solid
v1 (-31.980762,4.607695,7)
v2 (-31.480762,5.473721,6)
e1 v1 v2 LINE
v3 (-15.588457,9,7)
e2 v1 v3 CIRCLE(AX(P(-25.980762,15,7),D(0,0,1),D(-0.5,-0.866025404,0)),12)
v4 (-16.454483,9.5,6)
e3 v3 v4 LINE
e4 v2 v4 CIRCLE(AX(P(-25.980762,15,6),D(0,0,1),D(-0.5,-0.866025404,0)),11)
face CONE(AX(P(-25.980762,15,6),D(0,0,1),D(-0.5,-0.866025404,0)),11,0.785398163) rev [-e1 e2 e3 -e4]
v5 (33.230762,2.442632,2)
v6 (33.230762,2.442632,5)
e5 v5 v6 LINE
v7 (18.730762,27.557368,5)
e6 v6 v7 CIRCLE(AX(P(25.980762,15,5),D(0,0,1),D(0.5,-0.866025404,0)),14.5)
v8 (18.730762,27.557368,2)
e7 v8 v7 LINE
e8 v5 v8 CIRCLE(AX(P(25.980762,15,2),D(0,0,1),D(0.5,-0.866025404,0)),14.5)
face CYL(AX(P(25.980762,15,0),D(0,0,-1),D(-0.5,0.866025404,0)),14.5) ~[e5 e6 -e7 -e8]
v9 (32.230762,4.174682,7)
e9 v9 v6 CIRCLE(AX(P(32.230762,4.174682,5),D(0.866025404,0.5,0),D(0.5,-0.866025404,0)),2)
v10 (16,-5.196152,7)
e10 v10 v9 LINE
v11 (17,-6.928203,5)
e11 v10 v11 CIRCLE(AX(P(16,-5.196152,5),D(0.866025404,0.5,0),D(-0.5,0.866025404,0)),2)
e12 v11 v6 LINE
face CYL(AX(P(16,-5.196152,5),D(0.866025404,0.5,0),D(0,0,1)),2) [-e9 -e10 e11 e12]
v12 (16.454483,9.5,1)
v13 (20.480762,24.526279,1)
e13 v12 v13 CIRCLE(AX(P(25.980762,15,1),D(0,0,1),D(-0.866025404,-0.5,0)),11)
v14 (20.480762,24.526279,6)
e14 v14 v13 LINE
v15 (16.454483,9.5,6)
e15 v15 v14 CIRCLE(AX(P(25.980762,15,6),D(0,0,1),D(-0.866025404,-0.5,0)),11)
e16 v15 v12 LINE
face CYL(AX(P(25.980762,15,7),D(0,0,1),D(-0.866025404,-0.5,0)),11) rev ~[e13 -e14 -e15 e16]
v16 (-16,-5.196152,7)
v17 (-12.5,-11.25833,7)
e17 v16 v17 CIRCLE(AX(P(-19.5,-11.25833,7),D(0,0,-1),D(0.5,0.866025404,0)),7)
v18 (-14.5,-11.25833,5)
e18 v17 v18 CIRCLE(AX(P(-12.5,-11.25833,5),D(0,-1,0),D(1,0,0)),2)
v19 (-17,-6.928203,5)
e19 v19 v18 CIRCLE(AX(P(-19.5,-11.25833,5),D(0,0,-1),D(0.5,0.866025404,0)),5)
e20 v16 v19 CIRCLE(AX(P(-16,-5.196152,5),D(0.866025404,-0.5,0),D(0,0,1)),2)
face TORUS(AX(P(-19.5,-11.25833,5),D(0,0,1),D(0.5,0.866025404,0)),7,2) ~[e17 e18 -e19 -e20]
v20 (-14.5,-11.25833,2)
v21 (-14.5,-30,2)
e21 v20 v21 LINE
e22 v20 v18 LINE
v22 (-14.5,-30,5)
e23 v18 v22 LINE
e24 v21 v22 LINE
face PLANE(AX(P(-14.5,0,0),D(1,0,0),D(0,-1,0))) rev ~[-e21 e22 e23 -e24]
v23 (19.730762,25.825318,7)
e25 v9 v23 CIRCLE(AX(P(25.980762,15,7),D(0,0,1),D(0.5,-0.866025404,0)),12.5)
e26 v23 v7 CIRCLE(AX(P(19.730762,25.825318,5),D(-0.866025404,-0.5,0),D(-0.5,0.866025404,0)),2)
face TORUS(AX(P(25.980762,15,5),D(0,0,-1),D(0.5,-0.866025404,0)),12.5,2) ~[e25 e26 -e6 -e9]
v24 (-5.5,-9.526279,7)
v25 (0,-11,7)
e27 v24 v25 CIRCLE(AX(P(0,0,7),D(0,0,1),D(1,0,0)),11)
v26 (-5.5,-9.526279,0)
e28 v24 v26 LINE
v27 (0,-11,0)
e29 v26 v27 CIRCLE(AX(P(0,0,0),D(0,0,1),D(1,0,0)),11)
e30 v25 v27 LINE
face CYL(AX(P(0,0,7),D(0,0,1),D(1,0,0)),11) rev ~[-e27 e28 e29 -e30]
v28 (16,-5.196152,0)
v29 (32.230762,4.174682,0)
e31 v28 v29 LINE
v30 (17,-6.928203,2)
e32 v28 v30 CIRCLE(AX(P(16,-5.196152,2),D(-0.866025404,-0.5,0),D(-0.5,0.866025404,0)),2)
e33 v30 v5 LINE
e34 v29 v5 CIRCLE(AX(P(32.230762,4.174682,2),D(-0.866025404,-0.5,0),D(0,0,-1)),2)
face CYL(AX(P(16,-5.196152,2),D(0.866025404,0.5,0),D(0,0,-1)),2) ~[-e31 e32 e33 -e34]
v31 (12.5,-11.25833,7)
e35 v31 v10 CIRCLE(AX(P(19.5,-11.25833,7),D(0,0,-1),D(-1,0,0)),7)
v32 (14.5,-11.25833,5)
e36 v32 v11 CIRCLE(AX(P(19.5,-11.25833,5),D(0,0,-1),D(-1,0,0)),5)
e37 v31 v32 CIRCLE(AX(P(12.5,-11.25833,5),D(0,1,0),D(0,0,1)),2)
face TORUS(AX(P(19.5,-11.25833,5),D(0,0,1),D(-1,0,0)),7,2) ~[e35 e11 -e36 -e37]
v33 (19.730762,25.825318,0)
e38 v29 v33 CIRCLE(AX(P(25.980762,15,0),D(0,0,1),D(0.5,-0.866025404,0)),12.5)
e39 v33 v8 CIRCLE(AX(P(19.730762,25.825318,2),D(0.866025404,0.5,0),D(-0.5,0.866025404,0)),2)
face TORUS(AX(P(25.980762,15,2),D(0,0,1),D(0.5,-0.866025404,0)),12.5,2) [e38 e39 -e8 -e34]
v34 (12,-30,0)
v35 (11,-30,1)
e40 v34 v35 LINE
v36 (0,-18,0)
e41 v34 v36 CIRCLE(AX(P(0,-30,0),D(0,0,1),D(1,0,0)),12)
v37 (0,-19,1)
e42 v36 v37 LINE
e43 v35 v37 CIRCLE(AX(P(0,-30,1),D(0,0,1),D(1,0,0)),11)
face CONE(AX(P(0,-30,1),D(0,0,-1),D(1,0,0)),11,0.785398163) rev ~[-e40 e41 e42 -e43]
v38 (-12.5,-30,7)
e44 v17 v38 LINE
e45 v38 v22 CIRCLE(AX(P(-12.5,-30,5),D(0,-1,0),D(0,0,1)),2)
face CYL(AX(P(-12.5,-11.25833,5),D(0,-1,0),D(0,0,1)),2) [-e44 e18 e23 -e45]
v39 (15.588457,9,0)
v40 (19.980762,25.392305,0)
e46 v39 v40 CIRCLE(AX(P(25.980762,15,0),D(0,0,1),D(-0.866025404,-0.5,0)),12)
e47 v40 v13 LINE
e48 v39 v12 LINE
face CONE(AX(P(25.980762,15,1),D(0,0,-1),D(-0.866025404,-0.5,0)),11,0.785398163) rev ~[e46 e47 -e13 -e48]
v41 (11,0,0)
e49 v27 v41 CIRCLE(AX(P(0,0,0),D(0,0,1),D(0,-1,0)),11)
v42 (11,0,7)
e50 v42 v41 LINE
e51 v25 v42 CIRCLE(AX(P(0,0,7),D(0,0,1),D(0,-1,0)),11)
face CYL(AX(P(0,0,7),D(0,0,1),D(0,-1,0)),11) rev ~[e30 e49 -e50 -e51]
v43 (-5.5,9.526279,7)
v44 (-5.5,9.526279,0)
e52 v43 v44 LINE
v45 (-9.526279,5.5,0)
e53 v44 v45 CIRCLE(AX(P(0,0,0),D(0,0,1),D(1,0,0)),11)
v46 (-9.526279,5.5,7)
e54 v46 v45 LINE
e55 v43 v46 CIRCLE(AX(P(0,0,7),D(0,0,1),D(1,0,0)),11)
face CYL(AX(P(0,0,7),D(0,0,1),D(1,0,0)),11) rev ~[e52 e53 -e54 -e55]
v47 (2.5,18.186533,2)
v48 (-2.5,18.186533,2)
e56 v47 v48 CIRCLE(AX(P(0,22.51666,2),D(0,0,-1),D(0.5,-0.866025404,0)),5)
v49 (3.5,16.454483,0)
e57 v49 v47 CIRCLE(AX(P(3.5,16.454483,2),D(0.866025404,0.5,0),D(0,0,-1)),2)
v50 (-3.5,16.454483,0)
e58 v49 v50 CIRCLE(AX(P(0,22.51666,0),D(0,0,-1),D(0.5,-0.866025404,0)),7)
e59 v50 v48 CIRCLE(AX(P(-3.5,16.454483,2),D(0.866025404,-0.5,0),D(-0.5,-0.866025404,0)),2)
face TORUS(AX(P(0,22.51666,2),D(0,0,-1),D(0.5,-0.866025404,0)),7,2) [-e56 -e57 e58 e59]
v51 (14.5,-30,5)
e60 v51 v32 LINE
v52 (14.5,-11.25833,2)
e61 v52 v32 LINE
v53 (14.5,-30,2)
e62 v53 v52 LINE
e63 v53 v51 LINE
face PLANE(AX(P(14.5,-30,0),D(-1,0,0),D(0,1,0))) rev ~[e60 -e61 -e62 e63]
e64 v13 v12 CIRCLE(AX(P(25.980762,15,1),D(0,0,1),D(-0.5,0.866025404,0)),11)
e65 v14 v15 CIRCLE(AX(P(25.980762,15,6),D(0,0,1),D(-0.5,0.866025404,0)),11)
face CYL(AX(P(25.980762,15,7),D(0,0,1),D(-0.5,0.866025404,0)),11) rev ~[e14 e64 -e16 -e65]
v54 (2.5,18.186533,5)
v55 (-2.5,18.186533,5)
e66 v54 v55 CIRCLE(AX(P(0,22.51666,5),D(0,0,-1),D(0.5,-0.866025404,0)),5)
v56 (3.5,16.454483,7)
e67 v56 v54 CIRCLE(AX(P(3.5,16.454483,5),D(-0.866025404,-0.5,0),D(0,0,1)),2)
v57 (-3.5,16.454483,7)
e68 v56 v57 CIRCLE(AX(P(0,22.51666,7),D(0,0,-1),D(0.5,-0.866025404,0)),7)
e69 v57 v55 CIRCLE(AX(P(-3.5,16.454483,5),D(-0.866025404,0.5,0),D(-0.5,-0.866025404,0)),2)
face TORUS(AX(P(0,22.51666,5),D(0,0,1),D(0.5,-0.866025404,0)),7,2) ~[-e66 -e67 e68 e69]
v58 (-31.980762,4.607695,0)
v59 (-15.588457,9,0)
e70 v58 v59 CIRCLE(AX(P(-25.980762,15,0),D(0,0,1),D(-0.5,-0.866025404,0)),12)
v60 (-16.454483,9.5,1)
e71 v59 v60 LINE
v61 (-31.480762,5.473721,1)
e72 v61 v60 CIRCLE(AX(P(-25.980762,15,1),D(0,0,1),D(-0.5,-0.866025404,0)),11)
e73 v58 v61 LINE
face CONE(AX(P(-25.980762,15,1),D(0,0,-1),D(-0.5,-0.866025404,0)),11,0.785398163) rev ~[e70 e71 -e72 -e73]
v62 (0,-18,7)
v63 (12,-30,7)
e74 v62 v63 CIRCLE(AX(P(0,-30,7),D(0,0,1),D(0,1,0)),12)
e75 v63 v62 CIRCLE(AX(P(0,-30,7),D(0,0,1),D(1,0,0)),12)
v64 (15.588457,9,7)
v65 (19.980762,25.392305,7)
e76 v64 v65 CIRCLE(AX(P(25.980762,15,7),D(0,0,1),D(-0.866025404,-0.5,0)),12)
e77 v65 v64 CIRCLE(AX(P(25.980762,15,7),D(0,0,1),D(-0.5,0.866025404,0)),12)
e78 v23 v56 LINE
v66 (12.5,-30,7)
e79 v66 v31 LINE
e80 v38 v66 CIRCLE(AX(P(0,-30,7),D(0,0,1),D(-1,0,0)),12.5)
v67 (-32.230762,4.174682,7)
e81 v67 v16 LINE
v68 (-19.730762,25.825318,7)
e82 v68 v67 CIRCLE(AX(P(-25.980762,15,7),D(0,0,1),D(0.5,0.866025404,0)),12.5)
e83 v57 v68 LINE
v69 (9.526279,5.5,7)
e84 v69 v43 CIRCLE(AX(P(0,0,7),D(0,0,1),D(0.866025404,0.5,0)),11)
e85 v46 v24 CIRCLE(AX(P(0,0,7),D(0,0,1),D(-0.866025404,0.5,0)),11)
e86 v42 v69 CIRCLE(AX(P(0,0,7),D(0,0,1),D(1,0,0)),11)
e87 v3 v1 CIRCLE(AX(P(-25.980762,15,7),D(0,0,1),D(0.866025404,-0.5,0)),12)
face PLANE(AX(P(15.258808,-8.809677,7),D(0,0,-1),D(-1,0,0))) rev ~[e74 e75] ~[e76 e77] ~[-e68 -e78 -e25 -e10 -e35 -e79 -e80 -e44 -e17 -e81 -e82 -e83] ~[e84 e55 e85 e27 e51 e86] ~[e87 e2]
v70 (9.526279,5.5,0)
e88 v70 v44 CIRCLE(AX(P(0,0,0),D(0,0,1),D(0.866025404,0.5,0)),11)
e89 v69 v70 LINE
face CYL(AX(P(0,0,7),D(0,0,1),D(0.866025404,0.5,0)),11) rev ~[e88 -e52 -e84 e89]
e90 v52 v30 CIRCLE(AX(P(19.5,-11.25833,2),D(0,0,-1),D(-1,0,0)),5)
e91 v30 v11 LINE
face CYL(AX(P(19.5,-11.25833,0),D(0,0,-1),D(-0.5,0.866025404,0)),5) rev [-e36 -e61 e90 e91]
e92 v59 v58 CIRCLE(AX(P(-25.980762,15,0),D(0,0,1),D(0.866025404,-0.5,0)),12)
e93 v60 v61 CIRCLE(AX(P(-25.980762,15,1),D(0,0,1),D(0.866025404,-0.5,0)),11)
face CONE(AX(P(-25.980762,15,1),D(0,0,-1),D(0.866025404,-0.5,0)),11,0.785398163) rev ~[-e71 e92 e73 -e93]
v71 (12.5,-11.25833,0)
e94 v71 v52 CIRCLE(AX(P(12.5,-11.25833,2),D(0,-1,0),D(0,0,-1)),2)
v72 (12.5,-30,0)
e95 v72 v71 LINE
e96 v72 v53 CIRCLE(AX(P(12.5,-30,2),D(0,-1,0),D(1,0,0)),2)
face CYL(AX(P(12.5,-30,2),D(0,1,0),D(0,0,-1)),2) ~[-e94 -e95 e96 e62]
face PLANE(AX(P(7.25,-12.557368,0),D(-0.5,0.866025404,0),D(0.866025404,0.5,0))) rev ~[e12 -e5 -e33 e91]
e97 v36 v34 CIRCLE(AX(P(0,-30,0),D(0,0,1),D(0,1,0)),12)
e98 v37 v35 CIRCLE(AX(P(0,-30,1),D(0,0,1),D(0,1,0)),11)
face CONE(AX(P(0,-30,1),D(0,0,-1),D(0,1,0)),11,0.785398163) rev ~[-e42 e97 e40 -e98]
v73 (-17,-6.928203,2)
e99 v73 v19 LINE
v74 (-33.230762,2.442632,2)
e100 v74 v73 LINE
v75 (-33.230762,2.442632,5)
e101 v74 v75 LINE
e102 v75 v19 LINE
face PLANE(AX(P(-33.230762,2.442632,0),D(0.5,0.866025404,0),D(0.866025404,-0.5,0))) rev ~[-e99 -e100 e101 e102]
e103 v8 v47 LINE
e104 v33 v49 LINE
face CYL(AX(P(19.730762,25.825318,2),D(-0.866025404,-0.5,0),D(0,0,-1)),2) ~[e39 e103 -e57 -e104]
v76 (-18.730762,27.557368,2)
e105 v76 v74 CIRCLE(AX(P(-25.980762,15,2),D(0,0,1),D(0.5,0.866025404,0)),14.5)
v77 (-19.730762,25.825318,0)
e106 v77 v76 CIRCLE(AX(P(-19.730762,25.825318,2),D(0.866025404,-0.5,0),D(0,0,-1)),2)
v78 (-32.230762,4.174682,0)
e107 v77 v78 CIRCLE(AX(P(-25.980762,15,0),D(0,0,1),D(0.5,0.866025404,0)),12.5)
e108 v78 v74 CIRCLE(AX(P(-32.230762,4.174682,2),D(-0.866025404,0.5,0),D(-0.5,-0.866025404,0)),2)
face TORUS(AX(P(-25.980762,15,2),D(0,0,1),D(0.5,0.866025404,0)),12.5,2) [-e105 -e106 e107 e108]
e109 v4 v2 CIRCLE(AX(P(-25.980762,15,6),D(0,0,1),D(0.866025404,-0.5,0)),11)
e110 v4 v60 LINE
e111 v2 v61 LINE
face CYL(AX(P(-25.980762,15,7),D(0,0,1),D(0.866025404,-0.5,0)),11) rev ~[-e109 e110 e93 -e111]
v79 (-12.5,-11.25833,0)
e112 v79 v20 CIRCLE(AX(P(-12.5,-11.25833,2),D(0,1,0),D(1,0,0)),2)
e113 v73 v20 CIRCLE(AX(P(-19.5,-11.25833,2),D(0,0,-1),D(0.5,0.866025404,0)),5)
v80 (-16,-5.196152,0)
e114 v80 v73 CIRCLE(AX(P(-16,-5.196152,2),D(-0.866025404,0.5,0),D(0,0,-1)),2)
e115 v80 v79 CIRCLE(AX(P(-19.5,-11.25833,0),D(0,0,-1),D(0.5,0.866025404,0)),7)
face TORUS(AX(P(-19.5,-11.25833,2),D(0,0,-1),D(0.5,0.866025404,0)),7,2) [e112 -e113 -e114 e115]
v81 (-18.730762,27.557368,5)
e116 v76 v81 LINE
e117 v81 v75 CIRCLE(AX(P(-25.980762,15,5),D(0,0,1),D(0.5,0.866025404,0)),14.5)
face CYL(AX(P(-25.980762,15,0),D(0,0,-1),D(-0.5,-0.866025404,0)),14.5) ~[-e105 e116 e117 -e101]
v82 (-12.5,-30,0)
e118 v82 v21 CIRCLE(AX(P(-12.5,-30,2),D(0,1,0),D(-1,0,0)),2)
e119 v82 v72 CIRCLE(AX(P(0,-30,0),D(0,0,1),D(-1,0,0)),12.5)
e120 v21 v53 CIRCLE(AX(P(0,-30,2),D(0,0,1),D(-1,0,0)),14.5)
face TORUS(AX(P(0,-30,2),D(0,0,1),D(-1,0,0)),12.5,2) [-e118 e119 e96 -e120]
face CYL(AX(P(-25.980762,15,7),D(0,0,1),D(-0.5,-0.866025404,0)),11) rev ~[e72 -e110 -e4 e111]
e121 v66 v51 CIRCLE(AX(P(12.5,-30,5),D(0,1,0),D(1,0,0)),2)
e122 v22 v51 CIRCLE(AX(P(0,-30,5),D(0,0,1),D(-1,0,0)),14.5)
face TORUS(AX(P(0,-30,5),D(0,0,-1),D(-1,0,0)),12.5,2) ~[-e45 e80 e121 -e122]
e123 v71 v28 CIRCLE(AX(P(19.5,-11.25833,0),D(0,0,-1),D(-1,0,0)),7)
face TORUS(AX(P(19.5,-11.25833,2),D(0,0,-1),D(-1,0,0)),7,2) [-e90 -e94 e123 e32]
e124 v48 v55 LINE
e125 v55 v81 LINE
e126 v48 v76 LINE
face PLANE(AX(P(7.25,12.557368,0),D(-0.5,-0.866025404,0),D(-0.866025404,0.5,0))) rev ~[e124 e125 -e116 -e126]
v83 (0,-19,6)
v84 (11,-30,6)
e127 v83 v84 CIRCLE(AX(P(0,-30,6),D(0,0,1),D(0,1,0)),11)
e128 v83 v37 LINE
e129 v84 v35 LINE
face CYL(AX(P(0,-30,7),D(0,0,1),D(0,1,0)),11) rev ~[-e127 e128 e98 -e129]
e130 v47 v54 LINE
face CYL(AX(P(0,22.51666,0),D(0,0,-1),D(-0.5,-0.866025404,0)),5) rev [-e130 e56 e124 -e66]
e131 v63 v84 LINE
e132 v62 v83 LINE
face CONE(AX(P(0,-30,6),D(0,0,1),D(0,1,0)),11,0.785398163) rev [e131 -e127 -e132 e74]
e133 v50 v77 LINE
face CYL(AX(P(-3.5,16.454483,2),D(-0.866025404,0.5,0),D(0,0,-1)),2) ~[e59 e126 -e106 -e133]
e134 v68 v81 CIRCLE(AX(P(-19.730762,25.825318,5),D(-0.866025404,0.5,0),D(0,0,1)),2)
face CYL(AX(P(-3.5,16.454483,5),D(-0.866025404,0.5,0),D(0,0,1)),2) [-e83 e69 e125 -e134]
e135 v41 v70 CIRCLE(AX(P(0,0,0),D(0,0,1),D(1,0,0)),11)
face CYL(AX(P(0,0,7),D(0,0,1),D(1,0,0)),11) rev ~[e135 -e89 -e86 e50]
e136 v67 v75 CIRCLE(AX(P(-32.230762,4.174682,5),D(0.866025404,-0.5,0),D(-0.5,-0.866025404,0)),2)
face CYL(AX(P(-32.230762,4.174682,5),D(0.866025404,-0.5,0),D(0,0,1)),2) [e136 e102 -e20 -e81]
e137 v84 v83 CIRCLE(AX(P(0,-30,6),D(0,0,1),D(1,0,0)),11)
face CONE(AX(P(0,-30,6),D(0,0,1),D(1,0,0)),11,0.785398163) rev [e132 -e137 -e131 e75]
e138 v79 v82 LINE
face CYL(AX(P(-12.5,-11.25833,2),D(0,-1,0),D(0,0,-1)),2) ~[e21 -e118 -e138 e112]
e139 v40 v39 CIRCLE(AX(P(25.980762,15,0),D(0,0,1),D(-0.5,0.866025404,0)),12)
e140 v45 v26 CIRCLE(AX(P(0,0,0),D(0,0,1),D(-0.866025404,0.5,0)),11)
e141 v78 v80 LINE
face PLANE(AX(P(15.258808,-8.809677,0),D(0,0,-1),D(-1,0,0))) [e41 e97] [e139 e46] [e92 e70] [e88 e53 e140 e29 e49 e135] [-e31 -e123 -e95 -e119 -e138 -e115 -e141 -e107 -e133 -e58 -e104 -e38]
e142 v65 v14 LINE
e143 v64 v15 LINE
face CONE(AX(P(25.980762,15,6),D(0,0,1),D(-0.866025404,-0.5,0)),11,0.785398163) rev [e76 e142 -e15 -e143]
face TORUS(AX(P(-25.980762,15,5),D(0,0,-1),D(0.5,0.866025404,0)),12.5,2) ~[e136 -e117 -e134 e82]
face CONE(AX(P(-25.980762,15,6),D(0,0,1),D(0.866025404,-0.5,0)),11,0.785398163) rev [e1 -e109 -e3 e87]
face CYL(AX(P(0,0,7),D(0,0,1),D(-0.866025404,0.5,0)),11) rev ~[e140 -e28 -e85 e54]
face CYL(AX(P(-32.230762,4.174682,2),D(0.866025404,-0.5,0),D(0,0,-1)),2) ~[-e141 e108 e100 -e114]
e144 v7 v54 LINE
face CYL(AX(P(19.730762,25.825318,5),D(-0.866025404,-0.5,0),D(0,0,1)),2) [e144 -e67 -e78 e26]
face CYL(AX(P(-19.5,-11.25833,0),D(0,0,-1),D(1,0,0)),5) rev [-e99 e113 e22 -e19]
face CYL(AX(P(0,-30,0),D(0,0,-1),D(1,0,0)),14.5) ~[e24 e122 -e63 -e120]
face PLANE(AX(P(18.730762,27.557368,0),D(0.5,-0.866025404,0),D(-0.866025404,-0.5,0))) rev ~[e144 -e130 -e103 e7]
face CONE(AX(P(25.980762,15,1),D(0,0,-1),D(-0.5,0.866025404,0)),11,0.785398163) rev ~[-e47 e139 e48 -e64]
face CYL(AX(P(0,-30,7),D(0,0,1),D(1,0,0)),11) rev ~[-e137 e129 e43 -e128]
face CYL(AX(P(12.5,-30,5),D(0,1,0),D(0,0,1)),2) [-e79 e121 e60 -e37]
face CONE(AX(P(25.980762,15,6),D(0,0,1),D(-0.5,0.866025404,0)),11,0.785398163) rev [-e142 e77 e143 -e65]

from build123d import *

# Parameters (mm, degrees)
F1_DEPTH    = 7
F3_DEPTH    = 7.001
F5_COUNT    = 3
F7_T1_DEPTH = 7
F8_R        = 2
F9_SIZE     = 1


# Not quite as in the source:
# - a fillet or chamfer that OpenCascade refuses, or shapes differently, is made with other operations: its cross-section is extruded or revolved along the edge and cut away or added
# - a feature names something its author has since deleted; it is built from what else it names


with BuildPart() as f1:
    # F0 (on Top) → F1 (new body)
    with BuildSketch(Plane.XY):
        with BuildLine():
            ThreePointArc((-14.5, 0), (0, -14.5), (14.5, 0))
            ThreePointArc((14.5, 0), (0, 14.5), (-14.5, 0))
        make_face()
        with BuildLine():
            Line((14.5, -30), (14.5, 0))
            ThreePointArc((14.5, 0), (0, -14.5), (-14.5, 0))
            Line((-14.5, 0), (-14.5, -30))
            ThreePointArc((-14.5, -30), (0, -15.5), (14.5, -30))
        make_face()
        with BuildLine():
            ThreePointArc((-14.5, -30), (0, -44.5), (14.5, -30))
            ThreePointArc((14.5, -30), (0, -15.5), (-14.5, -30))
        make_face()
    extrude(amount=F1_DEPTH)

    # F2 (on face) → F3 (cut, through all)
    with BuildSketch(Plane.XY.offset(7)):
        with BuildLine():
            ThreePointArc((0, -11), (7.7781745931, -7.7781745931), (11, 0))
            ThreePointArc((11, 0), (-7.7781745931, 7.7781745931), (0, -11))
        make_face()
        with BuildLine():
            ThreePointArc((11, -30), (7.7781745931, -22.2218254069), (0, -19))
            ThreePointArc((0, -19), (-7.7781745931, -37.7781745931), (11, -30))
        make_face()
    extrude(amount=-F3_DEPTH, mode=Mode.SUBTRACT)


with BuildPart() as f5_1:
    # F5: instance of F1
    add(f1.part.rotate(Axis((0, 0, 13.2415927947), (0, 0, 1)), 1 * 360 / F5_COUNT))


with BuildPart() as f5_2:
    # F5: instance of F1
    add(f1.part.rotate(Axis((0, 0, 13.2415927947), (0, 0, 1)), 2 * 360 / F5_COUNT))


with BuildPart() as f1_1:
    add(f1.part)

    # F6: union F5_2, F5_1
    add(f5_2.part)
    add(f5_1.part)

    # F7: fillet of radius 5 on 6 edges, made by hand

    # F7_s2 → F7_t1 (join)
    with BuildSketch(Plane.XY):
        with BuildLine():
            ThreePointArc((17, -6.9282032303), (15.1698729811, -8.7583302492), (14.5, -11.2583302492))
            Line((14.5, -11.2583302492), (14.5, -8.3715789032))
            Line((14.5, -8.3715789032), (17, -6.9282032303))
        make_face()
        with BuildLine():
            ThreePointArc((-2.5, 18.1865334795), (0, 17.5166604984), (2.5, 18.1865334795))
            Line((2.5, 18.1865334795), (0, 16.7431578065))
            Line((0, 16.7431578065), (-2.5, 18.1865334795))
        make_face()
        with BuildLine():
            ThreePointArc((-14.5, -11.2583302492), (-15.1698729811, -8.7583302492), (-17, -6.9282032303))
            Line((-17, -6.9282032303), (-14.5, -8.3715789032))
            Line((-14.5, -8.3715789032), (-14.5, -11.2583302492))
        make_face()
    extrude(amount=F7_T1_DEPTH)

    # F8
    f8_edges = [f1_1.edges().sort_by_distance(p)[0] for p in [
        (38.53813, 22.25, 7),
        (0, -44.5, 0),
        (-25.115381, -2.242786, 0),
        (-15.169873, -8.75833, 0),
        (-14.5, -20.629165, 0),
        (14.5, -20.629165, 0),
        (15.169873, -8.75833, 0),
        (25.115381, -2.242786, 0),
        (38.53813, 22.25, 0),
        (10.615381, 22.871951, 0),
        (0, 17.51666, 0),
        (-10.615381, 22.871951, 0),
        (-38.53813, 22.25, 0),
        (-25.115381, -2.242786, 7),
        (-14.5, -20.629165, 7),
        (0, -44.5, 7),
        (14.5, -20.629165, 7),
        (25.115381, -2.242786, 7),
        (10.615381, 22.871951, 7),
        (-10.615381, 22.871951, 7),
        (-38.53813, 22.25, 7),
        (-15.169873, -8.75833, 7),
        (15.169873, -8.75833, 7),
        (0, 17.51666, 7),
    ]]
    fillet(f8_edges, radius=F8_R)

    # F9
    f9_edges = [f1_1.edges().sort_by_distance(p)[0] for p in [
        (-35.507042, 20.5, 7),
        (0, -41, 7),
        (35.507042, 20.5, 7),
        (0, -41, 0),
        (35.507042, 20.5, 0),
        (-35.507042, 20.5, 0),
    ]]
    chamfer(f9_edges, length=F9_SIZE)


solid = f1_1.part
